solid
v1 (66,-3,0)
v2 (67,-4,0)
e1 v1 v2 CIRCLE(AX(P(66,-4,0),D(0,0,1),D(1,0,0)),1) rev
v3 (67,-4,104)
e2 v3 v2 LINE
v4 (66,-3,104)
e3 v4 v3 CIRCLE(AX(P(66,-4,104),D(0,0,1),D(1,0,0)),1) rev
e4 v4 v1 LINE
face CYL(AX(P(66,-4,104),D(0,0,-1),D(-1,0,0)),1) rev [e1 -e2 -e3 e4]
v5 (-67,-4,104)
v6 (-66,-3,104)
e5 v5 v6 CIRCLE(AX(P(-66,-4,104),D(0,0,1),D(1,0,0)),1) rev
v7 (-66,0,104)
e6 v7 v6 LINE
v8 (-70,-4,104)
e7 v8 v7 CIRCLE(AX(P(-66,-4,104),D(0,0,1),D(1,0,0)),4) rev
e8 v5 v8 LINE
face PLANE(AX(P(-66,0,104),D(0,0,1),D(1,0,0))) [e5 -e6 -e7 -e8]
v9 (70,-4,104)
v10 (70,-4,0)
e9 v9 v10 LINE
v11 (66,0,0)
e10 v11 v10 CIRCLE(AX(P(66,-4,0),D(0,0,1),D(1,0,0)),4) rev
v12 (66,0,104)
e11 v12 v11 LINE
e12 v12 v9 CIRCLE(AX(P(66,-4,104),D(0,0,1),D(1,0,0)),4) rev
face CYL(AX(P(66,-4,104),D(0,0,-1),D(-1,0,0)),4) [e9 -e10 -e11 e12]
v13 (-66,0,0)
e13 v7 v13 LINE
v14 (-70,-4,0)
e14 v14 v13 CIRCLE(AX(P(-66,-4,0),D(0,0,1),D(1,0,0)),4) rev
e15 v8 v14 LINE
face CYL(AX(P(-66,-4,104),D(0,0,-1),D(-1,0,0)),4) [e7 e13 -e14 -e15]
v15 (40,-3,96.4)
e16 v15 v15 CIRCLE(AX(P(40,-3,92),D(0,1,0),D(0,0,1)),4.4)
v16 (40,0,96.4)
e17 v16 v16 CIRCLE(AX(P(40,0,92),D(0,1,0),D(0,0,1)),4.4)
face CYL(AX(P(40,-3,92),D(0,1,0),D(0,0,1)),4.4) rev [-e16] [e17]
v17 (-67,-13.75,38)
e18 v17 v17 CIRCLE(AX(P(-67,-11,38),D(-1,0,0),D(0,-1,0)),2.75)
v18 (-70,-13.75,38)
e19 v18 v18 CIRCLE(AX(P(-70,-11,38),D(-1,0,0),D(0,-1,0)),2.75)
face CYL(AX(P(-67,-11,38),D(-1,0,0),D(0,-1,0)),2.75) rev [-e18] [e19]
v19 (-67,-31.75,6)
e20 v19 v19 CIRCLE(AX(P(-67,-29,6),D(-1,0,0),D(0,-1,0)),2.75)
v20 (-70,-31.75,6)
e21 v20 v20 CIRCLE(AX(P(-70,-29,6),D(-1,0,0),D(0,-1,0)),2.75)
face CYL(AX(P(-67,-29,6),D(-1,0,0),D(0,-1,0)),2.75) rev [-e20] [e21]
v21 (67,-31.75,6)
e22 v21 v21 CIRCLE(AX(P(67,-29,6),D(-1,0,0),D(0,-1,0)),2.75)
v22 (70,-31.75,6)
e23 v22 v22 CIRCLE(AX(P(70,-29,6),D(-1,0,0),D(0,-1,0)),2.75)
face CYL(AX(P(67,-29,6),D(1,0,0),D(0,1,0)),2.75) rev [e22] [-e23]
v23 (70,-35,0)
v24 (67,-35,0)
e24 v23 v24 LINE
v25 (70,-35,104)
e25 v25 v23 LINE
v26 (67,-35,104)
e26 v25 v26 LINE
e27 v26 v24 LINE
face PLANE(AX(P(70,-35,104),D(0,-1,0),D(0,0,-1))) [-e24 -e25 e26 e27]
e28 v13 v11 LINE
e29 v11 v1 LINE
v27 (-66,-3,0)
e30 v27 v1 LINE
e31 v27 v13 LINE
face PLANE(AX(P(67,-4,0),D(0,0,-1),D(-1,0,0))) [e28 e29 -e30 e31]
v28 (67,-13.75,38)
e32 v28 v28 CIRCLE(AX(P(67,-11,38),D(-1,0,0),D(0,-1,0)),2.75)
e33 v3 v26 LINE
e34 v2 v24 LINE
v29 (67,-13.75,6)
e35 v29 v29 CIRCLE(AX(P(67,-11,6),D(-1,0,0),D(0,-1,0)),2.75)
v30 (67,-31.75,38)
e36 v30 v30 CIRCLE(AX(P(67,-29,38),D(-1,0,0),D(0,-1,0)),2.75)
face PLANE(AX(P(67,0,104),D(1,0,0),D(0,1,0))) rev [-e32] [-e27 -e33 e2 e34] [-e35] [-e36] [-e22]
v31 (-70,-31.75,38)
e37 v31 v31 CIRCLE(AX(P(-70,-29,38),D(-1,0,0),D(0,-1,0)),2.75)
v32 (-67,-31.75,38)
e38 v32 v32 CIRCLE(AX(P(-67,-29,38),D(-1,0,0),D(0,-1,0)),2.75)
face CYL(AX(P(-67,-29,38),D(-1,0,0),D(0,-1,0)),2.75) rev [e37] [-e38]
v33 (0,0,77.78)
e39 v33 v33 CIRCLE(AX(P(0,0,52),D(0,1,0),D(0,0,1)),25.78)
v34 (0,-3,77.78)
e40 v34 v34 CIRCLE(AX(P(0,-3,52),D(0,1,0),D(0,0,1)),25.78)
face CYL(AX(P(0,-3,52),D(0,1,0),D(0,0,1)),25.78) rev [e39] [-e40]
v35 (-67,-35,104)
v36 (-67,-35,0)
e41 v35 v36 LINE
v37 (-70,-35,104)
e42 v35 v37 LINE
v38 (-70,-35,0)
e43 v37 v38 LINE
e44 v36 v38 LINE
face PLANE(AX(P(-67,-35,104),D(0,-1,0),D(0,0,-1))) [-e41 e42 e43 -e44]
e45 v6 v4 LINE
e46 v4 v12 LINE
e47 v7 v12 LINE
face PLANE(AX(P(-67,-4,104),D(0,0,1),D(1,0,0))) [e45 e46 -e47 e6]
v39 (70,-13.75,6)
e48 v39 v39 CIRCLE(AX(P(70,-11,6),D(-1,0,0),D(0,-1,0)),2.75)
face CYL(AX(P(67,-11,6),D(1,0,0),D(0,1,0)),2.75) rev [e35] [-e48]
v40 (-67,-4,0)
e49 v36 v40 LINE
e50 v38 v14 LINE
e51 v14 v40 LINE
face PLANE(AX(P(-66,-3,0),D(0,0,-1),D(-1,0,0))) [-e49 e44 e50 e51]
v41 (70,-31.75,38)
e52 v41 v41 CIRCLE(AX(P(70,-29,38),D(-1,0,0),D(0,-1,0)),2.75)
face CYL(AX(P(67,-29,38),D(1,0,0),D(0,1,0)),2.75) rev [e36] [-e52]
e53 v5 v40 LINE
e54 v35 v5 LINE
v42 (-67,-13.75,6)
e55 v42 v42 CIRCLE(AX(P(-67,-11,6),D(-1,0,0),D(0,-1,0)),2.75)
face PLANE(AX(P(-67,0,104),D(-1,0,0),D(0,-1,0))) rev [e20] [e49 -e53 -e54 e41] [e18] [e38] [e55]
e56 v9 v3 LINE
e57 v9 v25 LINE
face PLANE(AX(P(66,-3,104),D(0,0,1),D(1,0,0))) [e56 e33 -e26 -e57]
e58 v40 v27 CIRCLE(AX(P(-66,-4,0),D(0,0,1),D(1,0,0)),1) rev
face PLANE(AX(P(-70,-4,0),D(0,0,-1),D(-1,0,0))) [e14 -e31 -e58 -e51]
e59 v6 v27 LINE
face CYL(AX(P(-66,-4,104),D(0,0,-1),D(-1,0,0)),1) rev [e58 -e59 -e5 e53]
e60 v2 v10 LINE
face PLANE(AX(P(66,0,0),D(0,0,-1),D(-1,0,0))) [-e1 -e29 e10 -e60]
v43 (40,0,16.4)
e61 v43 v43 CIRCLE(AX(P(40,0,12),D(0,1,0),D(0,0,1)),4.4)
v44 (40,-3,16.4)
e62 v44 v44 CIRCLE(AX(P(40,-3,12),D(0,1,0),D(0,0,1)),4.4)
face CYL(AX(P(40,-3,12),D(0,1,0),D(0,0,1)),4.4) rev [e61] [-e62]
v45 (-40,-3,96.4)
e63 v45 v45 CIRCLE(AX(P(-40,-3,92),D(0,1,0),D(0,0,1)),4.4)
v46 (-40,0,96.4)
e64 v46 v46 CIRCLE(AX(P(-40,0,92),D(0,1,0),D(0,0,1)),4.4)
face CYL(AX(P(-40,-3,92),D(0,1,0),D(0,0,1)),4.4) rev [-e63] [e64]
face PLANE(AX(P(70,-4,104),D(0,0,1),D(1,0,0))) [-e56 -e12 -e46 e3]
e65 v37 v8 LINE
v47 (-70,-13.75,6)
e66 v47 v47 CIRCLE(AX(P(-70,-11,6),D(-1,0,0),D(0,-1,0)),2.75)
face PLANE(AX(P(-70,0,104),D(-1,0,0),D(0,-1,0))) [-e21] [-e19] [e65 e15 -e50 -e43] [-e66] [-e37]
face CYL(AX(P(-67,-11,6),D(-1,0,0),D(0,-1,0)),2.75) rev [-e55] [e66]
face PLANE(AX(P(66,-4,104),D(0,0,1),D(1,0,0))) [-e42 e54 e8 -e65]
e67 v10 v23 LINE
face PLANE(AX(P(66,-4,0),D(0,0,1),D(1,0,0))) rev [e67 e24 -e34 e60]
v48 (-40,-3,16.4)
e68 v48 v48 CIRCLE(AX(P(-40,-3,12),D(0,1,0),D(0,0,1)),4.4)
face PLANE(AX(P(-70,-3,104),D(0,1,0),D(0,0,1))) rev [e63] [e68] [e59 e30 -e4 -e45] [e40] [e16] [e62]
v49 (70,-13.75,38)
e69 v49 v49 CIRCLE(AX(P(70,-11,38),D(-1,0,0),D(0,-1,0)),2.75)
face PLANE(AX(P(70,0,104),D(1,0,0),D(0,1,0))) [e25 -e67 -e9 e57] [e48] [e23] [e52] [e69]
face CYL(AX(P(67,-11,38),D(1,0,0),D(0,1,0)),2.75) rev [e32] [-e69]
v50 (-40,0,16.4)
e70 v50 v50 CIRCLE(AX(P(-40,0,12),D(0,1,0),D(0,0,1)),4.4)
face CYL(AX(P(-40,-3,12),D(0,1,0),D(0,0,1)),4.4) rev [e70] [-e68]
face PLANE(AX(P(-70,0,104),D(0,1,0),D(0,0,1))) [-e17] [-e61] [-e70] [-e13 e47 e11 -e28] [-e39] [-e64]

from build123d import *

# Parameters (mm, degrees)
SM_BASE_FLANGE_1_DEPTH = 104
SKETCH_7_R             = 2.75
CUT_EXTRUDE_3_DEPTH    = 3
SKETCH_8_R             = 25.78
CUT_EXTRUDE_4_DEPTH    = 3
SKETCH_9_R             = 4.4
CUT_EXTRUDE_5_DEPTH    = 3


# Sheet-metal steps are written as plain solids
with BuildPart() as part:
    # Sketch 1 → 基体-法兰1 (new body)
    with BuildSketch(Plane.XY):
        with BuildLine():
            Line((-70, -35), (-70, -4))
            ThreePointArc((-70, -4), (-68.828427125, -1.171572875), (-66, 0))
            Line((-66, 0), (66, 0))
            ThreePointArc((66, 0), (68.828427125, -1.171572875), (70, -4))
            Line((70, -4), (70, -35))
            Line((70, -35), (67, -35))
            Line((67, -35), (67, -4))
            ThreePointArc((67, -4), (66.707106781, -3.292893219), (66, -3))
            Line((66, -3), (-66, -3))
            ThreePointArc((-66, -3), (-66.707106781, -3.292893219), (-67, -4))
            Line((-67, -4), (-67, -35))
            Line((-67, -35), (-70, -35))
        make_face()
    extrude(amount=SM_BASE_FLANGE_1_DEPTH)

    # 草图7 → 切除-拉伸3 (cut)
    with BuildSketch(Plane.ZY.offset(70)):
        with Locations(Location((38, -29, 0), (0, 0, 270))):
            Circle(SKETCH_7_R)
        with Locations(Location((38, -11, 0), (0, 0, 270))):
            Circle(SKETCH_7_R)
        with Locations(Location((6, -11, 0), (0, 0, 270))):
            Circle(SKETCH_7_R)
        with Locations(Location((6, -29, 0), (0, 0, 270))):
            Circle(SKETCH_7_R)
    cut_extrude_3 = extrude(amount=-CUT_EXTRUDE_3_DEPTH, mode=Mode.SUBTRACT)

    # 镜向2: 切除-拉伸3 across plane
    add(cut_extrude_3.mirror(Plane(origin=(0, 0, 0), x_dir=(0, 0, 1), z_dir=(1, 0, 0))), mode=Mode.SUBTRACT)

    # 草图8 → 切除-拉伸4 (cut)
    with BuildSketch(Plane(origin=(0, 0, 0), x_dir=(1, 0, 0), z_dir=(0, 1, 0))):
        with Locations(Location((0, -52, 0), (0, 0, 270))):
            Circle(SKETCH_8_R)
    extrude(amount=-CUT_EXTRUDE_4_DEPTH, mode=Mode.SUBTRACT)

    # 草图9 → 切除-拉伸5 (cut)
    with BuildSketch(Plane(origin=(0, 0, 0), x_dir=(1, 0, 0), z_dir=(0, 1, 0))):
        with Locations(Location((-40, -12, 0), (0, 0, 270))):
            Circle(SKETCH_9_R)
        with Locations(Location((40, -12, 0), (0, 0, 270))):
            Circle(SKETCH_9_R)
        with Locations(Location((-40, -92, 0), (0, 0, 270))):
            Circle(SKETCH_9_R)
        with Locations(Location((40, -92, 0), (0, 0, 270))):
            Circle(SKETCH_9_R)
    extrude(amount=-CUT_EXTRUDE_5_DEPTH, mode=Mode.SUBTRACT)


solid = part.part
